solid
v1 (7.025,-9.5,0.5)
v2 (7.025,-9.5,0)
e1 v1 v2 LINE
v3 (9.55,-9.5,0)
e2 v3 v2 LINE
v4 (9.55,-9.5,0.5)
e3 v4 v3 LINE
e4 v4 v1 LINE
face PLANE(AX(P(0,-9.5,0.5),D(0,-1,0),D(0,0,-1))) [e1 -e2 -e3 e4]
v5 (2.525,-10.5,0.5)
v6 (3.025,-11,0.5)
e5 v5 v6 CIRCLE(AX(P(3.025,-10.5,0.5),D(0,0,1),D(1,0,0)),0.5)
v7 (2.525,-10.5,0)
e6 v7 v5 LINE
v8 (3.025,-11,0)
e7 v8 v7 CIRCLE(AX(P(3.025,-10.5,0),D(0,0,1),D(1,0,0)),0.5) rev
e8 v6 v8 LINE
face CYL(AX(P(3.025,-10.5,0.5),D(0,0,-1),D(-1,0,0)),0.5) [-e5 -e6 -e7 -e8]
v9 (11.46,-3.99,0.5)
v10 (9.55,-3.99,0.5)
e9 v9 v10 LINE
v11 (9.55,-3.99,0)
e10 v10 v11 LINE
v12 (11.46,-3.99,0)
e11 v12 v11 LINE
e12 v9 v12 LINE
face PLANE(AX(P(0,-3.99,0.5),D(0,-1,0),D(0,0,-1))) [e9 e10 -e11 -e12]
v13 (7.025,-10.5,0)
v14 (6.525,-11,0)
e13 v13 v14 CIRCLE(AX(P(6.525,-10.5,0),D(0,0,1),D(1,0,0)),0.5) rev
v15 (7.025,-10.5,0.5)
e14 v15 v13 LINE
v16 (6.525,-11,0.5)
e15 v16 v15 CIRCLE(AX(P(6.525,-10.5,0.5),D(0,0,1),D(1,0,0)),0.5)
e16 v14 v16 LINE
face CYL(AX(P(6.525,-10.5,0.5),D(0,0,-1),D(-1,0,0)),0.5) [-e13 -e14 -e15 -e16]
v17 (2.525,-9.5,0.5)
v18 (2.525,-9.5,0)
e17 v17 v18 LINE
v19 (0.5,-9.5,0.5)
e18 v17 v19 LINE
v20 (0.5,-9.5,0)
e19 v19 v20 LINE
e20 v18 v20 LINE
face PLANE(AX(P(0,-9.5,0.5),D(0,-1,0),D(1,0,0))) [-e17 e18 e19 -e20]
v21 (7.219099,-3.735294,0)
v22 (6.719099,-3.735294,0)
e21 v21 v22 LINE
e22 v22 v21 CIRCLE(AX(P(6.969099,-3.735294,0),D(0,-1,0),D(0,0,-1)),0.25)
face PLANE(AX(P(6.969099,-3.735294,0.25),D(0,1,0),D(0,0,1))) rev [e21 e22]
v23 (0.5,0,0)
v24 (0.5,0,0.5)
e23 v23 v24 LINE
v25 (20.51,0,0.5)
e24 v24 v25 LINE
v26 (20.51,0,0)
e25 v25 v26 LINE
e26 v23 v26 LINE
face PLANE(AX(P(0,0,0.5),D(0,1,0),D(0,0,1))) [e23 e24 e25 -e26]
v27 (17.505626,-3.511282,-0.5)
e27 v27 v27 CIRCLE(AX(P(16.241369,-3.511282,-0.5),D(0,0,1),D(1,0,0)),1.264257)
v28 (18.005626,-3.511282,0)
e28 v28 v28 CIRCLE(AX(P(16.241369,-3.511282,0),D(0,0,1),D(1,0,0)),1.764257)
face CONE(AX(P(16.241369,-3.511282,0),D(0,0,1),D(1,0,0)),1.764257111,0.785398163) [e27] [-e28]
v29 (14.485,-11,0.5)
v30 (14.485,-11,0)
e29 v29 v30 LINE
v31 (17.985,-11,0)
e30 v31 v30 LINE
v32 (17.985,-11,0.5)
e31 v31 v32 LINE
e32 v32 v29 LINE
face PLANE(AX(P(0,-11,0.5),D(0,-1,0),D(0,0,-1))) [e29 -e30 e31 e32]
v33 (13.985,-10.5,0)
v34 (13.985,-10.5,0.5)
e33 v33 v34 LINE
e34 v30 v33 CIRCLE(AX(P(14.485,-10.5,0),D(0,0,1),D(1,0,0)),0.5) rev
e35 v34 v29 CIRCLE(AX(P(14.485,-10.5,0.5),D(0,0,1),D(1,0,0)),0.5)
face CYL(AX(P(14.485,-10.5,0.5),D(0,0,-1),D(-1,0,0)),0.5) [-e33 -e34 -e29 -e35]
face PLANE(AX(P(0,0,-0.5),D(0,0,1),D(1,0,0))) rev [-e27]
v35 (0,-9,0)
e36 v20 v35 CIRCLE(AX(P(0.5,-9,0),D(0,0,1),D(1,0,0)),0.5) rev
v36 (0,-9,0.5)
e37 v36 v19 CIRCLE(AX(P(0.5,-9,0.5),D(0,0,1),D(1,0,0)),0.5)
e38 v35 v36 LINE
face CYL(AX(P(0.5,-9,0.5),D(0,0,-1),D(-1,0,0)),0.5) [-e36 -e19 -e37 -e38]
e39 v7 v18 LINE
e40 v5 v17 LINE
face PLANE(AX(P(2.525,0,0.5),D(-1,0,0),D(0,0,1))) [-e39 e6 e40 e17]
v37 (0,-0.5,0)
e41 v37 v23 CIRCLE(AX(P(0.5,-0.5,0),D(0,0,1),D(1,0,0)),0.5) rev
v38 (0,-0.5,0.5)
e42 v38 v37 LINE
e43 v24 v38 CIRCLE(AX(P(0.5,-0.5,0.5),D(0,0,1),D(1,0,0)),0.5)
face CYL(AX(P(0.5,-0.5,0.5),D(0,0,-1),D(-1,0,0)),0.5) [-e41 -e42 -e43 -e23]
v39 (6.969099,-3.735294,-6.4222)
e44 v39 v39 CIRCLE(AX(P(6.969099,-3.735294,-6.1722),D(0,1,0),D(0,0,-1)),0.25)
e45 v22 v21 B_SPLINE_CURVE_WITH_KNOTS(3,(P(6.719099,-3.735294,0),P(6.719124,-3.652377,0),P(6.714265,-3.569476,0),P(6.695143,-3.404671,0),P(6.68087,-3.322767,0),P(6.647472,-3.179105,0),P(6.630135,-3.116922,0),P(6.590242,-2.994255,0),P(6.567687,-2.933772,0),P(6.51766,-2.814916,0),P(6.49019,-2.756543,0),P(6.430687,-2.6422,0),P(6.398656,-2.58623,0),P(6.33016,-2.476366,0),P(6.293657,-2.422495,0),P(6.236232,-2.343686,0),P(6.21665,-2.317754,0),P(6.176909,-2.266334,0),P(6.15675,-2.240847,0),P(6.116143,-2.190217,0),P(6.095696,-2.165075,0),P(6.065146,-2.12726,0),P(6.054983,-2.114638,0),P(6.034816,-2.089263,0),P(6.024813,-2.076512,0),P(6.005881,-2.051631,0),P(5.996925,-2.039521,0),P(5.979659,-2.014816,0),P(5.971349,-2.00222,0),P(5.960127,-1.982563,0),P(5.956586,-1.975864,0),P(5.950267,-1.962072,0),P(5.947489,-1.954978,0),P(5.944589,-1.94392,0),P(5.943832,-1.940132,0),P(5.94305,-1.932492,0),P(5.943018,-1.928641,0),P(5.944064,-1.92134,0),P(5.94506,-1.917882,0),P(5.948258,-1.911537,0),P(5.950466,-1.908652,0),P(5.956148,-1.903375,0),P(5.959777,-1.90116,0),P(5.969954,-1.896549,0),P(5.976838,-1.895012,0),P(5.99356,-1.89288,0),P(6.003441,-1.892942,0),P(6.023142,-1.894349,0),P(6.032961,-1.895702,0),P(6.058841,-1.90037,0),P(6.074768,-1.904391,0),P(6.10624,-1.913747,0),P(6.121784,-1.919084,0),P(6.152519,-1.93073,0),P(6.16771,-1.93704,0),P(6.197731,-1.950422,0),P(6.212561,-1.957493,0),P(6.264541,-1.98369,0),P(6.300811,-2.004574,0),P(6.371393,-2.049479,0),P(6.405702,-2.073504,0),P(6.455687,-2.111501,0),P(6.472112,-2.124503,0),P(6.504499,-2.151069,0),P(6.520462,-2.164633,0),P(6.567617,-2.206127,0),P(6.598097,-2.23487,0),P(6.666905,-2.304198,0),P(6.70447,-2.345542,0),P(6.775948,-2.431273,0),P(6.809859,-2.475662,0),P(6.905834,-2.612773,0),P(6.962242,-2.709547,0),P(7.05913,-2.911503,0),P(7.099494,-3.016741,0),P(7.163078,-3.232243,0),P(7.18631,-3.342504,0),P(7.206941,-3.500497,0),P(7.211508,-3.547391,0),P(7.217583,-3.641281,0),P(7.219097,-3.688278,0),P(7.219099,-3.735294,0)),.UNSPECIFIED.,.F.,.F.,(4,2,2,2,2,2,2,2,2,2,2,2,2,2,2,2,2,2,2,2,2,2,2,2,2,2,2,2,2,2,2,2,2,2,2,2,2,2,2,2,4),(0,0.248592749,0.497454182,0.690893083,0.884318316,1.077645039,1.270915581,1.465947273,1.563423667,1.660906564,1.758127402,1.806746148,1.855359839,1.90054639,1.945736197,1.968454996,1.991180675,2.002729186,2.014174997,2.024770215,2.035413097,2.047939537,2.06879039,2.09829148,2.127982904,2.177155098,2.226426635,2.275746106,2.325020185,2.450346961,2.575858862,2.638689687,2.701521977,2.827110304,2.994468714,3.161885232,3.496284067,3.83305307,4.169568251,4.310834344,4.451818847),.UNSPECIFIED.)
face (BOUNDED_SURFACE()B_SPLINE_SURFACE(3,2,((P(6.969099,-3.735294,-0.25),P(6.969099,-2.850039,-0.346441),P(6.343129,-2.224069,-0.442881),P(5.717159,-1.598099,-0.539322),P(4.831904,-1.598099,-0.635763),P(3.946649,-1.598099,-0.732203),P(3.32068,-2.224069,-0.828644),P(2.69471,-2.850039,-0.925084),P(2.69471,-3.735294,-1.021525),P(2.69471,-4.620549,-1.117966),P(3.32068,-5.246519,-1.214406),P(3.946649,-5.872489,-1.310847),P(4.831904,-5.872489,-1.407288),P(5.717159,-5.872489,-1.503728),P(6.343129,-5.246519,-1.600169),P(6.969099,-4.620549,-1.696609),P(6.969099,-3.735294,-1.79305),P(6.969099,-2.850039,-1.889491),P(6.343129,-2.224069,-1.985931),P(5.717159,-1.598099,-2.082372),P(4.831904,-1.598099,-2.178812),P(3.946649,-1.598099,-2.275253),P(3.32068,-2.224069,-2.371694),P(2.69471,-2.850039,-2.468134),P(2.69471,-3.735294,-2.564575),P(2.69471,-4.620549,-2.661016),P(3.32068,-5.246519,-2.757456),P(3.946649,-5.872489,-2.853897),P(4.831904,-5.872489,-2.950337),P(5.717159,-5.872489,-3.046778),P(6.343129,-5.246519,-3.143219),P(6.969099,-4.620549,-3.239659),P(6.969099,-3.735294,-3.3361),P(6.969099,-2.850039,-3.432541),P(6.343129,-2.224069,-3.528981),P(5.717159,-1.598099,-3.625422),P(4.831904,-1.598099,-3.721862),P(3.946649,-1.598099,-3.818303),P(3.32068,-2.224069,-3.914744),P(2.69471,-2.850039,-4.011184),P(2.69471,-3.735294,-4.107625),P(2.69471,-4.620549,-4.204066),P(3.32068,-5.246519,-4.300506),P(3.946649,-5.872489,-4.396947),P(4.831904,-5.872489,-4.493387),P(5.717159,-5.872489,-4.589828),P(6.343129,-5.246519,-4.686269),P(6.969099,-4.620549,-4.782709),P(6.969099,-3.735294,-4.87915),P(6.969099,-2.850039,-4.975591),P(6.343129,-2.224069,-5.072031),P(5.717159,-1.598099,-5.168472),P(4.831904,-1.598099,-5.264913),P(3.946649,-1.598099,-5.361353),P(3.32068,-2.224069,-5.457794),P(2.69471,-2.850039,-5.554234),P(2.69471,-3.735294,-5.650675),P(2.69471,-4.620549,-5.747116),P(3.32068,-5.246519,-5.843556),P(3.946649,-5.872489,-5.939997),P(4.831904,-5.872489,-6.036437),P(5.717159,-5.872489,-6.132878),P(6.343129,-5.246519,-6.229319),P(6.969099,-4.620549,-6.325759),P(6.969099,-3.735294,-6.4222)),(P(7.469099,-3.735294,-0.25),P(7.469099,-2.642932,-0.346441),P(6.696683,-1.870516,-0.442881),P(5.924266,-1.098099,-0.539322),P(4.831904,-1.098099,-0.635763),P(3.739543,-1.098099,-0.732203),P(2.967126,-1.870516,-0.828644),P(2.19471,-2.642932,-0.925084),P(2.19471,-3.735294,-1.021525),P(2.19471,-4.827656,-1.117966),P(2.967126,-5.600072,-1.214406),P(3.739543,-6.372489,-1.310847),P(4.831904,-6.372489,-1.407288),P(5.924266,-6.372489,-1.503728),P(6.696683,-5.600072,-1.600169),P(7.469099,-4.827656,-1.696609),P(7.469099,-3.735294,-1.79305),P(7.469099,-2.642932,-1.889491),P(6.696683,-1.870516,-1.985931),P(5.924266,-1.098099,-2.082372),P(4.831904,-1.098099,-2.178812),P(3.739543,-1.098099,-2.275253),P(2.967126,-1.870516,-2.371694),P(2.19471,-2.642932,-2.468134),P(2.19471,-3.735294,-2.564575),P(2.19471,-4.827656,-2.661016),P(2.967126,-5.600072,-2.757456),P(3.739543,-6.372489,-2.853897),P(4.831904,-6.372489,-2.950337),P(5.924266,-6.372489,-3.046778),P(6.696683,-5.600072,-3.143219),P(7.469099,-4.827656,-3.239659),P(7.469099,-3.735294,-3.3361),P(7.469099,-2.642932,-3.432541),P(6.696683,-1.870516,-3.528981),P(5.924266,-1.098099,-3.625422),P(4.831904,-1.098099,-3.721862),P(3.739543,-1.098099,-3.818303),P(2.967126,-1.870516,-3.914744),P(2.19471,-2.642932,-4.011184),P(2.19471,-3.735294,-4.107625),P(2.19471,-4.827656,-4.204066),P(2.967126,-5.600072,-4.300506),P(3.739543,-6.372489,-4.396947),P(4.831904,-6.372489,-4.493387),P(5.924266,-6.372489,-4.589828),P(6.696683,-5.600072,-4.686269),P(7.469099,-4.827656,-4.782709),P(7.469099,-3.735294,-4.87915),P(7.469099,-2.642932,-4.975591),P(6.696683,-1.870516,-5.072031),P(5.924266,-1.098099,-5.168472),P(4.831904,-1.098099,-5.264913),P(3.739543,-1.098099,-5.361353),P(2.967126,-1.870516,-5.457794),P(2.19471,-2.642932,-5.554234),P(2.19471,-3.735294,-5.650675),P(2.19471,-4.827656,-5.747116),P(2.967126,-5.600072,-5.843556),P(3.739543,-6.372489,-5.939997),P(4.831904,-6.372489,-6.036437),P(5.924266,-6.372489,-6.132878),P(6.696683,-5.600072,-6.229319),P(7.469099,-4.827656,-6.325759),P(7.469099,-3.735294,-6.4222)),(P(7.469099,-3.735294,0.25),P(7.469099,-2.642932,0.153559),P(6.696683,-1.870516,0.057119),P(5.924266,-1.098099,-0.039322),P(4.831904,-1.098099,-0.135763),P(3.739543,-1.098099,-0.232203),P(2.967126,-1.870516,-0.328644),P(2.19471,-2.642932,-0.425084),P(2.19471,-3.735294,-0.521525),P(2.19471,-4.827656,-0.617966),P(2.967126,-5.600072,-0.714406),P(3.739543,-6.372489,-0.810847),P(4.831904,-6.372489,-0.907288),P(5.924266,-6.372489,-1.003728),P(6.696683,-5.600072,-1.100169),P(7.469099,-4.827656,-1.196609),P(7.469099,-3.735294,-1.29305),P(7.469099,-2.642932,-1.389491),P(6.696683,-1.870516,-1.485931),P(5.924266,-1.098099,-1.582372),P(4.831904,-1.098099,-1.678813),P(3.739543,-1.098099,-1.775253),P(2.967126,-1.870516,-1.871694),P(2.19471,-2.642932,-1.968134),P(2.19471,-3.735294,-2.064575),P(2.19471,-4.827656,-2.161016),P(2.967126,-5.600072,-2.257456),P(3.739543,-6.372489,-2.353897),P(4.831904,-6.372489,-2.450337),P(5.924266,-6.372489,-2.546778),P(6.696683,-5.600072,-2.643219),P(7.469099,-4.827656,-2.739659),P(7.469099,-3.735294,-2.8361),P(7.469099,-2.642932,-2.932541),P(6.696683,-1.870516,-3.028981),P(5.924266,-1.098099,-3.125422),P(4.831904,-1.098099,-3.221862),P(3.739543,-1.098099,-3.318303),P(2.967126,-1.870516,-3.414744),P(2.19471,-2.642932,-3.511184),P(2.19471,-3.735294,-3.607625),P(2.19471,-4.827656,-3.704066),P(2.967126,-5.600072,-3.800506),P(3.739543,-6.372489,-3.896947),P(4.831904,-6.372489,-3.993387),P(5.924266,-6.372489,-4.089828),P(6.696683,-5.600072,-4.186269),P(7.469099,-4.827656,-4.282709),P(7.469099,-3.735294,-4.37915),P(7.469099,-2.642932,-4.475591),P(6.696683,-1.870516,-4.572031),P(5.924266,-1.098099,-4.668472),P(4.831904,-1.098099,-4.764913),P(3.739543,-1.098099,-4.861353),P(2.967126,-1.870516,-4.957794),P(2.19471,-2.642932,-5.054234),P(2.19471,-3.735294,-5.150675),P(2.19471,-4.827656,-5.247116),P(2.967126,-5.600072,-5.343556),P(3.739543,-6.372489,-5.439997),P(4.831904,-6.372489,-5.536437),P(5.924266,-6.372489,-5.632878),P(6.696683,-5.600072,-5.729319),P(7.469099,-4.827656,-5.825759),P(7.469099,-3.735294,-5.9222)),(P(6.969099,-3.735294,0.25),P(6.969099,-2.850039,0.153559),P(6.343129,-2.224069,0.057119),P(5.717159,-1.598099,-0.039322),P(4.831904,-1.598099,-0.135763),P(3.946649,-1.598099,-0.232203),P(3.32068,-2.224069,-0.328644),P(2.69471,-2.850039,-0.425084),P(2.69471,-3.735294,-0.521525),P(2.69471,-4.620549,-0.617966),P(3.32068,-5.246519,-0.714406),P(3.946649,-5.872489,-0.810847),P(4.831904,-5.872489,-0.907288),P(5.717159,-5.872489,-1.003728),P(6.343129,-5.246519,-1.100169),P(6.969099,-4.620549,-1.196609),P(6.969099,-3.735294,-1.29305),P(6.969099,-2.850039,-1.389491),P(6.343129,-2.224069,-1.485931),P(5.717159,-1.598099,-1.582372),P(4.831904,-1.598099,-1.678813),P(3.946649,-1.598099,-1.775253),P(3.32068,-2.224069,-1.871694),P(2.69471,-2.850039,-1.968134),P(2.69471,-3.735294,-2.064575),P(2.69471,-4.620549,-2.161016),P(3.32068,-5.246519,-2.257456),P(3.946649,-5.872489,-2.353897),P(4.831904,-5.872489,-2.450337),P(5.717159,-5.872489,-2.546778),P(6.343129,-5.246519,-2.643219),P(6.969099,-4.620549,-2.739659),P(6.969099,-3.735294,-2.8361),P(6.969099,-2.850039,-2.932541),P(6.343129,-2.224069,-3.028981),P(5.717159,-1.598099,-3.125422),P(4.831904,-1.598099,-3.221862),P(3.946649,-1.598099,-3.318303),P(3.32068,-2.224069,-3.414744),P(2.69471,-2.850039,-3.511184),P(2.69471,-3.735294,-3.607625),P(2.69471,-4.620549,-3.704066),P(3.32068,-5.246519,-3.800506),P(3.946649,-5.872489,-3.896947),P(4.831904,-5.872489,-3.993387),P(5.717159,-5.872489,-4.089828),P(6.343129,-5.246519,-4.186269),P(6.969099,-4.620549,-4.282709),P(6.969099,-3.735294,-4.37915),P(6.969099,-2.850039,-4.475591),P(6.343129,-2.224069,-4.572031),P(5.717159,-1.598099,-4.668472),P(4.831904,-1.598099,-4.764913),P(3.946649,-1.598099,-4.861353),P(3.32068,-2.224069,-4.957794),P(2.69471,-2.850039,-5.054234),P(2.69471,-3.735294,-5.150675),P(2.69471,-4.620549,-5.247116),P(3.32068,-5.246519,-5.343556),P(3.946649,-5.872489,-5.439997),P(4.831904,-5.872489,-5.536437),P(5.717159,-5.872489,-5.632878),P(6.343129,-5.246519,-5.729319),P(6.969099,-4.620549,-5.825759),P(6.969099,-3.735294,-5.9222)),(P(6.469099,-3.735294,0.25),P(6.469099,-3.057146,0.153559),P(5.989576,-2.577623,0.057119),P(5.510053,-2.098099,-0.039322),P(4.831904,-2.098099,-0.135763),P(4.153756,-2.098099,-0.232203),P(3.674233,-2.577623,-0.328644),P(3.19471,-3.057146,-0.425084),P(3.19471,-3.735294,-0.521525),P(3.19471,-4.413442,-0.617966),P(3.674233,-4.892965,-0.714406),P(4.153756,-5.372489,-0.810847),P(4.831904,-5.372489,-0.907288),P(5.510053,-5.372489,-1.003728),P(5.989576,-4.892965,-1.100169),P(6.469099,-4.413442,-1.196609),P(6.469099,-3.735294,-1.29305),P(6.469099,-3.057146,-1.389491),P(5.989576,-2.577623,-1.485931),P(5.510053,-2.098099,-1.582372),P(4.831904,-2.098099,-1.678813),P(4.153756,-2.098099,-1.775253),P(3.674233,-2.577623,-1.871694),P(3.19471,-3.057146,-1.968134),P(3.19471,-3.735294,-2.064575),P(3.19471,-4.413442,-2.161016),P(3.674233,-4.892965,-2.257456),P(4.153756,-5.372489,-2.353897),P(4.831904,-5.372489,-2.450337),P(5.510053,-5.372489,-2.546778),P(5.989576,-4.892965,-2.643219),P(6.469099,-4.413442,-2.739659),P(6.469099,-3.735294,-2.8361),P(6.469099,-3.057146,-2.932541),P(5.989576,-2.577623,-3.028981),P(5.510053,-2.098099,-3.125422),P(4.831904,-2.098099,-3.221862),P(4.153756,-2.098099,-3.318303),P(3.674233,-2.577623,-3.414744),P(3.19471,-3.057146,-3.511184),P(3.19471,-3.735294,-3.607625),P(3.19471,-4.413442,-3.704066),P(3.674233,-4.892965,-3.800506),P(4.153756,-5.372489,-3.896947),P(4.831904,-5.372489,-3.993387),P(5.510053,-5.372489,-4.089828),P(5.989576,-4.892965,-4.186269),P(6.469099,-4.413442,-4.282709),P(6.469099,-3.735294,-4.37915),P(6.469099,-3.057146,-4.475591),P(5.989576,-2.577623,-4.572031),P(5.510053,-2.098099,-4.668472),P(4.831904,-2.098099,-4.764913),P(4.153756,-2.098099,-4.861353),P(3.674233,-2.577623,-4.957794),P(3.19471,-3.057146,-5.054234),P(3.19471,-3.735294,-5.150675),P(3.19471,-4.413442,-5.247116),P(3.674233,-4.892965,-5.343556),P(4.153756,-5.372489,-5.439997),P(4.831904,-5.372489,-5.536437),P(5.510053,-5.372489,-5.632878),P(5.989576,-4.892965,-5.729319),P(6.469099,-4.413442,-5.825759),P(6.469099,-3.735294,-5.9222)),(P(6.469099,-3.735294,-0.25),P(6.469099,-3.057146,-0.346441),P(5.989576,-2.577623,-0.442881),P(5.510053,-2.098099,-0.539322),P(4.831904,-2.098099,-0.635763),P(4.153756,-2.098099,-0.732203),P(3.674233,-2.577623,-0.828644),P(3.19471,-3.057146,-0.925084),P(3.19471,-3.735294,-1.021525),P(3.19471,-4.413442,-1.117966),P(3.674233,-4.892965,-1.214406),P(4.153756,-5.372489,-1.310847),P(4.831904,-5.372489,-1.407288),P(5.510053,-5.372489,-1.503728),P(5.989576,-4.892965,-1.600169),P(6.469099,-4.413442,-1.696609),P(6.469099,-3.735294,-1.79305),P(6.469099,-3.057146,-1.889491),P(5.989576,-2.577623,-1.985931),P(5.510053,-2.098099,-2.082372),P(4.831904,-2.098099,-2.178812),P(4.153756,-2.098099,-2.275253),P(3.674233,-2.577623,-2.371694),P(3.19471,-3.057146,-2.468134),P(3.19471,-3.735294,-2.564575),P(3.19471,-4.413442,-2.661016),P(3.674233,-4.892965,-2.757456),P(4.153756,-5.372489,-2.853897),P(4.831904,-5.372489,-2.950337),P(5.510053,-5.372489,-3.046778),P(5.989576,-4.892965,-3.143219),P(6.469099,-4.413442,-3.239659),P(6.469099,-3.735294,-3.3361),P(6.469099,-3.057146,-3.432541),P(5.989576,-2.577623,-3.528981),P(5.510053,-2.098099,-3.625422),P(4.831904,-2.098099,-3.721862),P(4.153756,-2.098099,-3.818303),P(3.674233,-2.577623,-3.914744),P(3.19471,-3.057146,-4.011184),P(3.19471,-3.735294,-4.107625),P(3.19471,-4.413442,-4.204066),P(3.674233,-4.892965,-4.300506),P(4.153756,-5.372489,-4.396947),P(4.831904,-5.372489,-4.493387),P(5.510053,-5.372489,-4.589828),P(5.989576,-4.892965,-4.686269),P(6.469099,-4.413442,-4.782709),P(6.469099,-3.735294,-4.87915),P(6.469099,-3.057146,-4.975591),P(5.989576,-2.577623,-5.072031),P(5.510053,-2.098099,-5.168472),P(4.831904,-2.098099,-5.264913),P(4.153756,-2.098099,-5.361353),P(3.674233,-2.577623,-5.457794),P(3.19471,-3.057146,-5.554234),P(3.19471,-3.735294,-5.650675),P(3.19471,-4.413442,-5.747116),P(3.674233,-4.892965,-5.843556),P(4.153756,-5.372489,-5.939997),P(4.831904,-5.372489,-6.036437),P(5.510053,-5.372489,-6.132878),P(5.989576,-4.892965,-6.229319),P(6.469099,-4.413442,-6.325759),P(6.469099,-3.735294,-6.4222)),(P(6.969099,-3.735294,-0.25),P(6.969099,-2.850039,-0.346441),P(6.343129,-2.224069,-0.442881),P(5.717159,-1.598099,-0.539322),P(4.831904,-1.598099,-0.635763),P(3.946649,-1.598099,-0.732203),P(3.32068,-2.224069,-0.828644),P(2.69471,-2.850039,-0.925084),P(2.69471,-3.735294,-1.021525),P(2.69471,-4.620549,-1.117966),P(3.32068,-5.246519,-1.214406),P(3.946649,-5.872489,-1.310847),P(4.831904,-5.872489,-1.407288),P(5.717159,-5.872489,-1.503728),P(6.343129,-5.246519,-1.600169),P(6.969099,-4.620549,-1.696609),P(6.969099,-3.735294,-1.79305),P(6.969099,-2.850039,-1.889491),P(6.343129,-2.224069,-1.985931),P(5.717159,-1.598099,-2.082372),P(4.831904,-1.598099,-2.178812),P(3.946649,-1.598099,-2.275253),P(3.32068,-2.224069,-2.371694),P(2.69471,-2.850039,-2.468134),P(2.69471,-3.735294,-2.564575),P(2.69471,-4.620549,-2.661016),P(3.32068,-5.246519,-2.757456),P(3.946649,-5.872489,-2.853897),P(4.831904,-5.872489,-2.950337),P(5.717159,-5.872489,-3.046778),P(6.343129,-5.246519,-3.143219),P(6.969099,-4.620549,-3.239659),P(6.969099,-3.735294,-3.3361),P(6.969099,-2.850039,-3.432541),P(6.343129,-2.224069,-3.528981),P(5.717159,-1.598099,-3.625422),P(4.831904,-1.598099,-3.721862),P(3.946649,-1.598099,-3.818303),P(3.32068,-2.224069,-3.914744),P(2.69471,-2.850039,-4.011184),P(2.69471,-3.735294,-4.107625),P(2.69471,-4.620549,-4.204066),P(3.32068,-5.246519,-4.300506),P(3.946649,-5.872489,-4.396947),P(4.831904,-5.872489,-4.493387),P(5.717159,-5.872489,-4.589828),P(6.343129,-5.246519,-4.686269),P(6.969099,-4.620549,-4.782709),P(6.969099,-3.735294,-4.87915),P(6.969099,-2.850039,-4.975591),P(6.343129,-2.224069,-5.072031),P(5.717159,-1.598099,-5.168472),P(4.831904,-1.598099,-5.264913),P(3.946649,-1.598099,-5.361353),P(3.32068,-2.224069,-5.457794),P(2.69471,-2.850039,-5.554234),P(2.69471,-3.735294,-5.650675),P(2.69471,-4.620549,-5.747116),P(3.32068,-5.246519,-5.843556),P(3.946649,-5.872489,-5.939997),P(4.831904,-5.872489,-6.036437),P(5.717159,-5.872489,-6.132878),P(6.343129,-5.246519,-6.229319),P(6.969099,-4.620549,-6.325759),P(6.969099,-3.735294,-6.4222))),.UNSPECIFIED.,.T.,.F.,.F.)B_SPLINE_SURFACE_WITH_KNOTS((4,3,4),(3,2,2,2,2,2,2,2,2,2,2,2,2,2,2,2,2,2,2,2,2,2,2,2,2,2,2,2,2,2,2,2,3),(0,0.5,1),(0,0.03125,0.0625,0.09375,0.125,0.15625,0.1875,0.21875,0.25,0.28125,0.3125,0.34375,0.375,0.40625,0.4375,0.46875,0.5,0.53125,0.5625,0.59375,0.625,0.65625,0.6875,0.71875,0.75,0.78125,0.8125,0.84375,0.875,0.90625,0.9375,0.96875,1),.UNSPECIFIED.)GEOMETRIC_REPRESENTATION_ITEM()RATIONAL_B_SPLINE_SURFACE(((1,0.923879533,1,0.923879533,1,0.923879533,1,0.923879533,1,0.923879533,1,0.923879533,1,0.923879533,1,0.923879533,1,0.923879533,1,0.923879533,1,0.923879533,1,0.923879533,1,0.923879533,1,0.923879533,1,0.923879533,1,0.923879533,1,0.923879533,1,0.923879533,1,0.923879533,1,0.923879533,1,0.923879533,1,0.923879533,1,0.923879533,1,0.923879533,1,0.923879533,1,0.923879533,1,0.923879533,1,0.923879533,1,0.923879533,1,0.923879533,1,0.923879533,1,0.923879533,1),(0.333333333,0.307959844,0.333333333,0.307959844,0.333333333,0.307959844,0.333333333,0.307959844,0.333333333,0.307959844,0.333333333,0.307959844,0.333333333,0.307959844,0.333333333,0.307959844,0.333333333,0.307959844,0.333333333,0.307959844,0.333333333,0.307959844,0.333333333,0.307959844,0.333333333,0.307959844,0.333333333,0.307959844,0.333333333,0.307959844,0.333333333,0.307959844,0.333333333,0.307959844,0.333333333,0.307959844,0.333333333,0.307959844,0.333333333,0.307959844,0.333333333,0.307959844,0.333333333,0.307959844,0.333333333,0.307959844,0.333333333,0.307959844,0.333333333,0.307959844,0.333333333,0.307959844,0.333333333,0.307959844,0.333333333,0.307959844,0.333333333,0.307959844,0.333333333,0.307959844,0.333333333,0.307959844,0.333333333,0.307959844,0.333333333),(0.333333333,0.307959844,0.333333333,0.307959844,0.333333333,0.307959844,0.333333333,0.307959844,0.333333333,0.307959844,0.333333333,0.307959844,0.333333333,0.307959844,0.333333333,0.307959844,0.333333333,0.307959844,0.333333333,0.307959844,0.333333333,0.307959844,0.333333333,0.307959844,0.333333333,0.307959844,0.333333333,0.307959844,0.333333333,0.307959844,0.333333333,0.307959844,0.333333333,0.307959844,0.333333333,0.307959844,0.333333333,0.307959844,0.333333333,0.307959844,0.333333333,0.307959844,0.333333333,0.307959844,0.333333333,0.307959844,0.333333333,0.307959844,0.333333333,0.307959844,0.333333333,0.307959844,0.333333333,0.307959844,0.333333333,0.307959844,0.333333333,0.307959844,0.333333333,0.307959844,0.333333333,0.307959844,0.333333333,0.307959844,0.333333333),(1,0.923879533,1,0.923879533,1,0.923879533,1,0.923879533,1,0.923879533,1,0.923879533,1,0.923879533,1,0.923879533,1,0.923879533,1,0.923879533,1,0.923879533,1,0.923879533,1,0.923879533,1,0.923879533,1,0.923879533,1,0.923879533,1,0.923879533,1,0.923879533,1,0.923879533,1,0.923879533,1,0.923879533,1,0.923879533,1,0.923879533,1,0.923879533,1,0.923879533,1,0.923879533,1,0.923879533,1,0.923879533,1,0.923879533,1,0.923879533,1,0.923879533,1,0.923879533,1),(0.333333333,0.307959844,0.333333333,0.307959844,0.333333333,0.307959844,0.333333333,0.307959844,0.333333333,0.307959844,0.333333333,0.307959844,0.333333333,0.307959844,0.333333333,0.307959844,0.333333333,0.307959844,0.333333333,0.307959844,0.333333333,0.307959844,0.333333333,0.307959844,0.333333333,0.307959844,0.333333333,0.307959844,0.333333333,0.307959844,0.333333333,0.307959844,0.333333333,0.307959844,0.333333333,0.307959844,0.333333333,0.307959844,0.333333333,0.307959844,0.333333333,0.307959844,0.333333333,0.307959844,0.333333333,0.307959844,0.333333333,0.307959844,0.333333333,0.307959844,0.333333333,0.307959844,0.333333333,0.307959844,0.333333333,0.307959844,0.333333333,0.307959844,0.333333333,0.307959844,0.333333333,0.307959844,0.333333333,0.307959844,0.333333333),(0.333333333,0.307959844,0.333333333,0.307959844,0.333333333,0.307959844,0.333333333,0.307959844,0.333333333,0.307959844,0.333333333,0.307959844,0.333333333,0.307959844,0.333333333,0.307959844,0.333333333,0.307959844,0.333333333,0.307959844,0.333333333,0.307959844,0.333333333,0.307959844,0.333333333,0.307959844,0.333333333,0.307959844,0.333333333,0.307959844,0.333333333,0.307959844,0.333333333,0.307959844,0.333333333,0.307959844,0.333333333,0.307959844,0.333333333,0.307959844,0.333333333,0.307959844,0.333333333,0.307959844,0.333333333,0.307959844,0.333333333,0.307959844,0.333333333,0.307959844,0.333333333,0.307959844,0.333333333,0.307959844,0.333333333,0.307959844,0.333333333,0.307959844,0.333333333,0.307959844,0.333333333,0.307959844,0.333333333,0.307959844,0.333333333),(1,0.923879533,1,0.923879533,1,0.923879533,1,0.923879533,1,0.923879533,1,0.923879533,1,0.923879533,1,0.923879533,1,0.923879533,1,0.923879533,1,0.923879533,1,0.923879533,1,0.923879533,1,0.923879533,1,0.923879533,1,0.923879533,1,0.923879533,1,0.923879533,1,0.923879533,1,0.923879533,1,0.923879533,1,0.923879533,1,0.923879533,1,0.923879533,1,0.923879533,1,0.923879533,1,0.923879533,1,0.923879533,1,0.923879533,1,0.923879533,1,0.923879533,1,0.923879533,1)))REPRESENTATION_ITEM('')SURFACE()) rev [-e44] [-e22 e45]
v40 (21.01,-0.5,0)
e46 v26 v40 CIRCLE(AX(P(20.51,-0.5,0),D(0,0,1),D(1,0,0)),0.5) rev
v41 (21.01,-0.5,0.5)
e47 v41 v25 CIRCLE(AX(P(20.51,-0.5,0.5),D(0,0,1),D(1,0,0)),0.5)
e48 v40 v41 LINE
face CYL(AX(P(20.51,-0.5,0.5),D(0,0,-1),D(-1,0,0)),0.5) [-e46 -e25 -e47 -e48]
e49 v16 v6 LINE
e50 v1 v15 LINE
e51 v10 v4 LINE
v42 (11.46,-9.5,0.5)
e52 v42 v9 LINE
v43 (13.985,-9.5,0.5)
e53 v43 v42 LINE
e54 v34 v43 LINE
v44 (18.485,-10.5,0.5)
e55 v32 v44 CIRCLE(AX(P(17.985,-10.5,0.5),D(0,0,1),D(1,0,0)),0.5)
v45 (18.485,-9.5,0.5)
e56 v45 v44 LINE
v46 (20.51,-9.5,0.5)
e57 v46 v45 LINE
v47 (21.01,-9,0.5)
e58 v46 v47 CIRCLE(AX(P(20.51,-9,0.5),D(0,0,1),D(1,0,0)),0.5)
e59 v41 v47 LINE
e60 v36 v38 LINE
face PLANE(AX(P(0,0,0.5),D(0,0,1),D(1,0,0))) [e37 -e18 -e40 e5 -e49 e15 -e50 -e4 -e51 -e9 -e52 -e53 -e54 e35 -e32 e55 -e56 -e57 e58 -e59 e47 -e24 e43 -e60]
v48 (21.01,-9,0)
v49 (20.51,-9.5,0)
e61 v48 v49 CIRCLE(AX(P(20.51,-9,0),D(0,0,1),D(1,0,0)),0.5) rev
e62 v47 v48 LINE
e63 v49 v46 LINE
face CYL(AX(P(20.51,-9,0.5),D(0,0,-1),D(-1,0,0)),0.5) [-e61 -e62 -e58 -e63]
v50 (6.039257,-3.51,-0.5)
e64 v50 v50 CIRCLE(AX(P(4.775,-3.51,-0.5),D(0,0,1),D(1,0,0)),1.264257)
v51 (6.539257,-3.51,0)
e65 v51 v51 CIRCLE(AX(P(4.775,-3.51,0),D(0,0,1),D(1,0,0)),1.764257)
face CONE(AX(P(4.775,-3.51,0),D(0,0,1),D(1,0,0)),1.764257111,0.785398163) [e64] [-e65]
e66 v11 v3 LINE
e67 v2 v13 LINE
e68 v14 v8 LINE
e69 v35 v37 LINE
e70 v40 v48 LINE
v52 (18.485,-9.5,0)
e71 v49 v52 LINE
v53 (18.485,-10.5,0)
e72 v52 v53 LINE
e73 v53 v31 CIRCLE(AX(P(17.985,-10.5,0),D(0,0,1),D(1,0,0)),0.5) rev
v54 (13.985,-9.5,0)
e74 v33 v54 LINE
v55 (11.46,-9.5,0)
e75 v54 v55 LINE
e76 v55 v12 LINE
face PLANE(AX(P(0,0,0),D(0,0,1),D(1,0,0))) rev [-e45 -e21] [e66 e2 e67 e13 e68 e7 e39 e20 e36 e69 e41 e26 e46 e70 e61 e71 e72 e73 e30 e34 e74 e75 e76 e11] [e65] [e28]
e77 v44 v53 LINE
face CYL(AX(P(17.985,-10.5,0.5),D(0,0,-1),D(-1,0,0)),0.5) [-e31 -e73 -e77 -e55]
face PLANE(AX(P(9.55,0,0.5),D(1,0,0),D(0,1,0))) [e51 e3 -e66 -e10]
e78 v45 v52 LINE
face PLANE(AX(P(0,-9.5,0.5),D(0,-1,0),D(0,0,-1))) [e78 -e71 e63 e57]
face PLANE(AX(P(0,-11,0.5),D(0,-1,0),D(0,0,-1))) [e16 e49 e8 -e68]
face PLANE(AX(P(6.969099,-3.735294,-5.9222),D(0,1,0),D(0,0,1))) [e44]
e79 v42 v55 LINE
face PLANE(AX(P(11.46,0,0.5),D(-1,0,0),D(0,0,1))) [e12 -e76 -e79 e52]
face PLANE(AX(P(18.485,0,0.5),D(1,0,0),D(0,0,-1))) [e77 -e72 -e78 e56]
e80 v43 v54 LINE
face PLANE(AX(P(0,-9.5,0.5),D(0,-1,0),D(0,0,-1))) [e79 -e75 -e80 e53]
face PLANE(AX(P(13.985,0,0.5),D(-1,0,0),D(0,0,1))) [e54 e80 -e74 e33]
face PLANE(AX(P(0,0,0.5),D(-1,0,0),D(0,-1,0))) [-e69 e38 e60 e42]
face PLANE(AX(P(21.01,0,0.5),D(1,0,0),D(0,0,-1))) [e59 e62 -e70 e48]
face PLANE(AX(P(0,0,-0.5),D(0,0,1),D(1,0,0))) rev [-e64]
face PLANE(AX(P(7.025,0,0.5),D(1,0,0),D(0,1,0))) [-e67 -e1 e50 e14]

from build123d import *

# Parameters (mm, degrees)
SKETCH1_R           = 1.264257111
BOSS_EXTRUDE1_DEPTH = 0.5
SKETCH1_3_R         = 1.264257111
BOSS_EXTRUDE2_DEPTH = 0.5
CHAMFER1_SIZE       = 0.5
SWEEP1_PITCH        = 1.54305
FILLET1_R           = 0.5


with BuildPart() as part:
    # Sketch1 → Boss-Extrude1 (new body)
    # profile 1 of 3: a face of its own
    with BuildSketch(Plane.XY):
        Polygon((0, -9.5), (0, 0), (21.01, 0), (21.01, -9.5), (18.485, -9.5), (18.485, -11), (13.985, -11), (13.985, -9.5), (11.46, -9.5), (11.46, -3.99), (9.55, -3.99), (9.55, -9.5), (7.025, -9.5), (7.025, -11), (2.525, -11), (2.525, -9.5), align=None)
        with Locations((16.241368736, -3.511282068)):
            Circle(SKETCH1_R, mode=Mode.SUBTRACT)
        with Locations((4.775, -3.51)):
            Circle(SKETCH1_R, mode=Mode.SUBTRACT)
    # profile 2 of 3: a face of its own
    with BuildSketch(Plane.XY):
        with Locations((4.775, -3.51)):
            Circle(SKETCH1_R)
    # profile 3 of 3: a face of its own
    with BuildSketch(Plane.XY):
        with Locations((16.241368736, -3.511282068)):
            Circle(SKETCH1_R)
    extrude(amount=BOSS_EXTRUDE1_DEPTH)

    # Sketch1<3> → Boss-Extrude2 (add)
    with BuildSketch(Plane.XY):
        with Locations((16.241368736, -3.511282068)):
            Circle(SKETCH1_3_R)
        with Locations((4.775, -3.51)):
            Circle(SKETCH1_3_R)
    extrude(amount=-BOSS_EXTRUDE2_DEPTH)

    # Chamfer1
    chamfer1_edges = [part.edges().sort_by_distance(p)[0] for p in [
        (14.977111625, -3.511282068, 0),
        (3.510742889, -3.51, 0),
    ]]
    chamfer(chamfer1_edges, length=CHAMFER1_SIZE - 0.0001)  # a hair under: the kernel refuses the full size

    # Sweep1: the profile of Sketch3 screwed along a left-hand helix of 4 turns, 8 arcs to a turn; built about Z, then put on its axis
    sweep1_z = Axis((0, 0, 0), (0, 0, 1))
    sweep1_corners = [(1.887194579, 0, 0), (2.137194579, 0, 0.25), (2.387194579, 0, 0), (2.137194579, 0, -0.25)]
    with BuildLine(mode=Mode.PRIVATE) as sweep1_profile:
        ThreePointArc((1.887194579, 0, 0), (1.960417884, 0, 0.176776695), (2.137194579, 0, 0.25))
        ThreePointArc((2.137194579, 0, 0.25), (2.313971274, 0, 0.176776695), (2.387194579, 0, 0))
        ThreePointArc((2.387194579, 0, 0), (2.313971274, 0, -0.176776695), (2.137194579, 0, -0.25))
        ThreePointArc((2.137194579, 0, -0.25), (1.960417884, 0, -0.176776695), (1.887194579, 0, 0))
    sweep1_cap = Face(sweep1_profile.wire())
    sweep1_arcs = [((1.887194579, 0, 0), (1.887194579, 0, 0.25), (2.137194579, 0, 0.25), (1, 0.7071067811865476, 1)), ((2.137194579, 0, 0.25), (2.387194579, 0, 0.25), (2.387194579, 0, 0), (1, 0.7071067811865476, 1)), ((2.387194579, 0, 0), (2.387194579, 0, -0.25), (2.137194579, 0, -0.25), (1, 0.7071067811865476, 1)), ((2.137194579, 0, -0.25), (1.887194579, 0, -0.25), (1.887194579, 0, 0), (1, 0.7071067811865476, 1))]  # start, shoulder, end, weights
    sweep1_turn_angles = [0, -22.5, -45, -67.5, -90, -112.5, -135, -157.5, -180, -202.5, -225, -247.5, -270, -292.5, -315, -337.5, -360]
    sweep1_turn_weights = [1, 0.9238795325112867, 1, 0.9238795325112867, 1, 0.9238795325112867, 1, 0.9238795325112867, 1, 0.9238795325112867, 1, 0.9238795325112867, 1, 0.9238795325112867, 1, 0.9238795325112867, 1]
    sweep1_turn_sides = [Face.make_bezier_surface([[Vector(p[j][0], p[j][1], 0).rotate(sweep1_z, sweep1_turn_angles[2 * i + k]) / sweep1_turn_weights[2 * i + k] + Vector(0, 0, p[j][2] + -SWEEP1_PITCH * sweep1_turn_angles[2 * i + k] / 360) for k in range(3)] for j in range(3)], [[p[3][j] * sweep1_turn_weights[2 * i + k] for k in range(3)] for j in range(3)]) for p in sweep1_arcs for i in range(8)]
    sweep1 = Plane(origin=(4.831904448, -3.735293954, 0), x_dir=(1, 0, 0), z_dir=(0, 0, -1)) * Solid(Shell([*[p.moved(Location((0, 0, SWEEP1_PITCH * i))) for i in range(4) for p in sweep1_turn_sides], sweep1_cap, sweep1_cap.rotate(sweep1_z, -1440).moved(Location((0, 0, -SWEEP1_PITCH * -1440 / 360)))]))
    add(sweep1)

    # Fillet1
    fillet1_edges = [part.edges().sort_by_distance(p)[0] for p in [
        (0, 0, 0.25),
        (21.01, 0, 0.25),
        (21.01, -9.5, 0.25),
        (18.485, -11, 0.25),
        (13.985, -11, 0.25),
        (7.025, -11, 0.25),
        (2.525, -11, 0.25),
        (0, -9.5, 0.25),
    ]]
    fillet(fillet1_edges, radius=FILLET1_R)


solid = part.part
